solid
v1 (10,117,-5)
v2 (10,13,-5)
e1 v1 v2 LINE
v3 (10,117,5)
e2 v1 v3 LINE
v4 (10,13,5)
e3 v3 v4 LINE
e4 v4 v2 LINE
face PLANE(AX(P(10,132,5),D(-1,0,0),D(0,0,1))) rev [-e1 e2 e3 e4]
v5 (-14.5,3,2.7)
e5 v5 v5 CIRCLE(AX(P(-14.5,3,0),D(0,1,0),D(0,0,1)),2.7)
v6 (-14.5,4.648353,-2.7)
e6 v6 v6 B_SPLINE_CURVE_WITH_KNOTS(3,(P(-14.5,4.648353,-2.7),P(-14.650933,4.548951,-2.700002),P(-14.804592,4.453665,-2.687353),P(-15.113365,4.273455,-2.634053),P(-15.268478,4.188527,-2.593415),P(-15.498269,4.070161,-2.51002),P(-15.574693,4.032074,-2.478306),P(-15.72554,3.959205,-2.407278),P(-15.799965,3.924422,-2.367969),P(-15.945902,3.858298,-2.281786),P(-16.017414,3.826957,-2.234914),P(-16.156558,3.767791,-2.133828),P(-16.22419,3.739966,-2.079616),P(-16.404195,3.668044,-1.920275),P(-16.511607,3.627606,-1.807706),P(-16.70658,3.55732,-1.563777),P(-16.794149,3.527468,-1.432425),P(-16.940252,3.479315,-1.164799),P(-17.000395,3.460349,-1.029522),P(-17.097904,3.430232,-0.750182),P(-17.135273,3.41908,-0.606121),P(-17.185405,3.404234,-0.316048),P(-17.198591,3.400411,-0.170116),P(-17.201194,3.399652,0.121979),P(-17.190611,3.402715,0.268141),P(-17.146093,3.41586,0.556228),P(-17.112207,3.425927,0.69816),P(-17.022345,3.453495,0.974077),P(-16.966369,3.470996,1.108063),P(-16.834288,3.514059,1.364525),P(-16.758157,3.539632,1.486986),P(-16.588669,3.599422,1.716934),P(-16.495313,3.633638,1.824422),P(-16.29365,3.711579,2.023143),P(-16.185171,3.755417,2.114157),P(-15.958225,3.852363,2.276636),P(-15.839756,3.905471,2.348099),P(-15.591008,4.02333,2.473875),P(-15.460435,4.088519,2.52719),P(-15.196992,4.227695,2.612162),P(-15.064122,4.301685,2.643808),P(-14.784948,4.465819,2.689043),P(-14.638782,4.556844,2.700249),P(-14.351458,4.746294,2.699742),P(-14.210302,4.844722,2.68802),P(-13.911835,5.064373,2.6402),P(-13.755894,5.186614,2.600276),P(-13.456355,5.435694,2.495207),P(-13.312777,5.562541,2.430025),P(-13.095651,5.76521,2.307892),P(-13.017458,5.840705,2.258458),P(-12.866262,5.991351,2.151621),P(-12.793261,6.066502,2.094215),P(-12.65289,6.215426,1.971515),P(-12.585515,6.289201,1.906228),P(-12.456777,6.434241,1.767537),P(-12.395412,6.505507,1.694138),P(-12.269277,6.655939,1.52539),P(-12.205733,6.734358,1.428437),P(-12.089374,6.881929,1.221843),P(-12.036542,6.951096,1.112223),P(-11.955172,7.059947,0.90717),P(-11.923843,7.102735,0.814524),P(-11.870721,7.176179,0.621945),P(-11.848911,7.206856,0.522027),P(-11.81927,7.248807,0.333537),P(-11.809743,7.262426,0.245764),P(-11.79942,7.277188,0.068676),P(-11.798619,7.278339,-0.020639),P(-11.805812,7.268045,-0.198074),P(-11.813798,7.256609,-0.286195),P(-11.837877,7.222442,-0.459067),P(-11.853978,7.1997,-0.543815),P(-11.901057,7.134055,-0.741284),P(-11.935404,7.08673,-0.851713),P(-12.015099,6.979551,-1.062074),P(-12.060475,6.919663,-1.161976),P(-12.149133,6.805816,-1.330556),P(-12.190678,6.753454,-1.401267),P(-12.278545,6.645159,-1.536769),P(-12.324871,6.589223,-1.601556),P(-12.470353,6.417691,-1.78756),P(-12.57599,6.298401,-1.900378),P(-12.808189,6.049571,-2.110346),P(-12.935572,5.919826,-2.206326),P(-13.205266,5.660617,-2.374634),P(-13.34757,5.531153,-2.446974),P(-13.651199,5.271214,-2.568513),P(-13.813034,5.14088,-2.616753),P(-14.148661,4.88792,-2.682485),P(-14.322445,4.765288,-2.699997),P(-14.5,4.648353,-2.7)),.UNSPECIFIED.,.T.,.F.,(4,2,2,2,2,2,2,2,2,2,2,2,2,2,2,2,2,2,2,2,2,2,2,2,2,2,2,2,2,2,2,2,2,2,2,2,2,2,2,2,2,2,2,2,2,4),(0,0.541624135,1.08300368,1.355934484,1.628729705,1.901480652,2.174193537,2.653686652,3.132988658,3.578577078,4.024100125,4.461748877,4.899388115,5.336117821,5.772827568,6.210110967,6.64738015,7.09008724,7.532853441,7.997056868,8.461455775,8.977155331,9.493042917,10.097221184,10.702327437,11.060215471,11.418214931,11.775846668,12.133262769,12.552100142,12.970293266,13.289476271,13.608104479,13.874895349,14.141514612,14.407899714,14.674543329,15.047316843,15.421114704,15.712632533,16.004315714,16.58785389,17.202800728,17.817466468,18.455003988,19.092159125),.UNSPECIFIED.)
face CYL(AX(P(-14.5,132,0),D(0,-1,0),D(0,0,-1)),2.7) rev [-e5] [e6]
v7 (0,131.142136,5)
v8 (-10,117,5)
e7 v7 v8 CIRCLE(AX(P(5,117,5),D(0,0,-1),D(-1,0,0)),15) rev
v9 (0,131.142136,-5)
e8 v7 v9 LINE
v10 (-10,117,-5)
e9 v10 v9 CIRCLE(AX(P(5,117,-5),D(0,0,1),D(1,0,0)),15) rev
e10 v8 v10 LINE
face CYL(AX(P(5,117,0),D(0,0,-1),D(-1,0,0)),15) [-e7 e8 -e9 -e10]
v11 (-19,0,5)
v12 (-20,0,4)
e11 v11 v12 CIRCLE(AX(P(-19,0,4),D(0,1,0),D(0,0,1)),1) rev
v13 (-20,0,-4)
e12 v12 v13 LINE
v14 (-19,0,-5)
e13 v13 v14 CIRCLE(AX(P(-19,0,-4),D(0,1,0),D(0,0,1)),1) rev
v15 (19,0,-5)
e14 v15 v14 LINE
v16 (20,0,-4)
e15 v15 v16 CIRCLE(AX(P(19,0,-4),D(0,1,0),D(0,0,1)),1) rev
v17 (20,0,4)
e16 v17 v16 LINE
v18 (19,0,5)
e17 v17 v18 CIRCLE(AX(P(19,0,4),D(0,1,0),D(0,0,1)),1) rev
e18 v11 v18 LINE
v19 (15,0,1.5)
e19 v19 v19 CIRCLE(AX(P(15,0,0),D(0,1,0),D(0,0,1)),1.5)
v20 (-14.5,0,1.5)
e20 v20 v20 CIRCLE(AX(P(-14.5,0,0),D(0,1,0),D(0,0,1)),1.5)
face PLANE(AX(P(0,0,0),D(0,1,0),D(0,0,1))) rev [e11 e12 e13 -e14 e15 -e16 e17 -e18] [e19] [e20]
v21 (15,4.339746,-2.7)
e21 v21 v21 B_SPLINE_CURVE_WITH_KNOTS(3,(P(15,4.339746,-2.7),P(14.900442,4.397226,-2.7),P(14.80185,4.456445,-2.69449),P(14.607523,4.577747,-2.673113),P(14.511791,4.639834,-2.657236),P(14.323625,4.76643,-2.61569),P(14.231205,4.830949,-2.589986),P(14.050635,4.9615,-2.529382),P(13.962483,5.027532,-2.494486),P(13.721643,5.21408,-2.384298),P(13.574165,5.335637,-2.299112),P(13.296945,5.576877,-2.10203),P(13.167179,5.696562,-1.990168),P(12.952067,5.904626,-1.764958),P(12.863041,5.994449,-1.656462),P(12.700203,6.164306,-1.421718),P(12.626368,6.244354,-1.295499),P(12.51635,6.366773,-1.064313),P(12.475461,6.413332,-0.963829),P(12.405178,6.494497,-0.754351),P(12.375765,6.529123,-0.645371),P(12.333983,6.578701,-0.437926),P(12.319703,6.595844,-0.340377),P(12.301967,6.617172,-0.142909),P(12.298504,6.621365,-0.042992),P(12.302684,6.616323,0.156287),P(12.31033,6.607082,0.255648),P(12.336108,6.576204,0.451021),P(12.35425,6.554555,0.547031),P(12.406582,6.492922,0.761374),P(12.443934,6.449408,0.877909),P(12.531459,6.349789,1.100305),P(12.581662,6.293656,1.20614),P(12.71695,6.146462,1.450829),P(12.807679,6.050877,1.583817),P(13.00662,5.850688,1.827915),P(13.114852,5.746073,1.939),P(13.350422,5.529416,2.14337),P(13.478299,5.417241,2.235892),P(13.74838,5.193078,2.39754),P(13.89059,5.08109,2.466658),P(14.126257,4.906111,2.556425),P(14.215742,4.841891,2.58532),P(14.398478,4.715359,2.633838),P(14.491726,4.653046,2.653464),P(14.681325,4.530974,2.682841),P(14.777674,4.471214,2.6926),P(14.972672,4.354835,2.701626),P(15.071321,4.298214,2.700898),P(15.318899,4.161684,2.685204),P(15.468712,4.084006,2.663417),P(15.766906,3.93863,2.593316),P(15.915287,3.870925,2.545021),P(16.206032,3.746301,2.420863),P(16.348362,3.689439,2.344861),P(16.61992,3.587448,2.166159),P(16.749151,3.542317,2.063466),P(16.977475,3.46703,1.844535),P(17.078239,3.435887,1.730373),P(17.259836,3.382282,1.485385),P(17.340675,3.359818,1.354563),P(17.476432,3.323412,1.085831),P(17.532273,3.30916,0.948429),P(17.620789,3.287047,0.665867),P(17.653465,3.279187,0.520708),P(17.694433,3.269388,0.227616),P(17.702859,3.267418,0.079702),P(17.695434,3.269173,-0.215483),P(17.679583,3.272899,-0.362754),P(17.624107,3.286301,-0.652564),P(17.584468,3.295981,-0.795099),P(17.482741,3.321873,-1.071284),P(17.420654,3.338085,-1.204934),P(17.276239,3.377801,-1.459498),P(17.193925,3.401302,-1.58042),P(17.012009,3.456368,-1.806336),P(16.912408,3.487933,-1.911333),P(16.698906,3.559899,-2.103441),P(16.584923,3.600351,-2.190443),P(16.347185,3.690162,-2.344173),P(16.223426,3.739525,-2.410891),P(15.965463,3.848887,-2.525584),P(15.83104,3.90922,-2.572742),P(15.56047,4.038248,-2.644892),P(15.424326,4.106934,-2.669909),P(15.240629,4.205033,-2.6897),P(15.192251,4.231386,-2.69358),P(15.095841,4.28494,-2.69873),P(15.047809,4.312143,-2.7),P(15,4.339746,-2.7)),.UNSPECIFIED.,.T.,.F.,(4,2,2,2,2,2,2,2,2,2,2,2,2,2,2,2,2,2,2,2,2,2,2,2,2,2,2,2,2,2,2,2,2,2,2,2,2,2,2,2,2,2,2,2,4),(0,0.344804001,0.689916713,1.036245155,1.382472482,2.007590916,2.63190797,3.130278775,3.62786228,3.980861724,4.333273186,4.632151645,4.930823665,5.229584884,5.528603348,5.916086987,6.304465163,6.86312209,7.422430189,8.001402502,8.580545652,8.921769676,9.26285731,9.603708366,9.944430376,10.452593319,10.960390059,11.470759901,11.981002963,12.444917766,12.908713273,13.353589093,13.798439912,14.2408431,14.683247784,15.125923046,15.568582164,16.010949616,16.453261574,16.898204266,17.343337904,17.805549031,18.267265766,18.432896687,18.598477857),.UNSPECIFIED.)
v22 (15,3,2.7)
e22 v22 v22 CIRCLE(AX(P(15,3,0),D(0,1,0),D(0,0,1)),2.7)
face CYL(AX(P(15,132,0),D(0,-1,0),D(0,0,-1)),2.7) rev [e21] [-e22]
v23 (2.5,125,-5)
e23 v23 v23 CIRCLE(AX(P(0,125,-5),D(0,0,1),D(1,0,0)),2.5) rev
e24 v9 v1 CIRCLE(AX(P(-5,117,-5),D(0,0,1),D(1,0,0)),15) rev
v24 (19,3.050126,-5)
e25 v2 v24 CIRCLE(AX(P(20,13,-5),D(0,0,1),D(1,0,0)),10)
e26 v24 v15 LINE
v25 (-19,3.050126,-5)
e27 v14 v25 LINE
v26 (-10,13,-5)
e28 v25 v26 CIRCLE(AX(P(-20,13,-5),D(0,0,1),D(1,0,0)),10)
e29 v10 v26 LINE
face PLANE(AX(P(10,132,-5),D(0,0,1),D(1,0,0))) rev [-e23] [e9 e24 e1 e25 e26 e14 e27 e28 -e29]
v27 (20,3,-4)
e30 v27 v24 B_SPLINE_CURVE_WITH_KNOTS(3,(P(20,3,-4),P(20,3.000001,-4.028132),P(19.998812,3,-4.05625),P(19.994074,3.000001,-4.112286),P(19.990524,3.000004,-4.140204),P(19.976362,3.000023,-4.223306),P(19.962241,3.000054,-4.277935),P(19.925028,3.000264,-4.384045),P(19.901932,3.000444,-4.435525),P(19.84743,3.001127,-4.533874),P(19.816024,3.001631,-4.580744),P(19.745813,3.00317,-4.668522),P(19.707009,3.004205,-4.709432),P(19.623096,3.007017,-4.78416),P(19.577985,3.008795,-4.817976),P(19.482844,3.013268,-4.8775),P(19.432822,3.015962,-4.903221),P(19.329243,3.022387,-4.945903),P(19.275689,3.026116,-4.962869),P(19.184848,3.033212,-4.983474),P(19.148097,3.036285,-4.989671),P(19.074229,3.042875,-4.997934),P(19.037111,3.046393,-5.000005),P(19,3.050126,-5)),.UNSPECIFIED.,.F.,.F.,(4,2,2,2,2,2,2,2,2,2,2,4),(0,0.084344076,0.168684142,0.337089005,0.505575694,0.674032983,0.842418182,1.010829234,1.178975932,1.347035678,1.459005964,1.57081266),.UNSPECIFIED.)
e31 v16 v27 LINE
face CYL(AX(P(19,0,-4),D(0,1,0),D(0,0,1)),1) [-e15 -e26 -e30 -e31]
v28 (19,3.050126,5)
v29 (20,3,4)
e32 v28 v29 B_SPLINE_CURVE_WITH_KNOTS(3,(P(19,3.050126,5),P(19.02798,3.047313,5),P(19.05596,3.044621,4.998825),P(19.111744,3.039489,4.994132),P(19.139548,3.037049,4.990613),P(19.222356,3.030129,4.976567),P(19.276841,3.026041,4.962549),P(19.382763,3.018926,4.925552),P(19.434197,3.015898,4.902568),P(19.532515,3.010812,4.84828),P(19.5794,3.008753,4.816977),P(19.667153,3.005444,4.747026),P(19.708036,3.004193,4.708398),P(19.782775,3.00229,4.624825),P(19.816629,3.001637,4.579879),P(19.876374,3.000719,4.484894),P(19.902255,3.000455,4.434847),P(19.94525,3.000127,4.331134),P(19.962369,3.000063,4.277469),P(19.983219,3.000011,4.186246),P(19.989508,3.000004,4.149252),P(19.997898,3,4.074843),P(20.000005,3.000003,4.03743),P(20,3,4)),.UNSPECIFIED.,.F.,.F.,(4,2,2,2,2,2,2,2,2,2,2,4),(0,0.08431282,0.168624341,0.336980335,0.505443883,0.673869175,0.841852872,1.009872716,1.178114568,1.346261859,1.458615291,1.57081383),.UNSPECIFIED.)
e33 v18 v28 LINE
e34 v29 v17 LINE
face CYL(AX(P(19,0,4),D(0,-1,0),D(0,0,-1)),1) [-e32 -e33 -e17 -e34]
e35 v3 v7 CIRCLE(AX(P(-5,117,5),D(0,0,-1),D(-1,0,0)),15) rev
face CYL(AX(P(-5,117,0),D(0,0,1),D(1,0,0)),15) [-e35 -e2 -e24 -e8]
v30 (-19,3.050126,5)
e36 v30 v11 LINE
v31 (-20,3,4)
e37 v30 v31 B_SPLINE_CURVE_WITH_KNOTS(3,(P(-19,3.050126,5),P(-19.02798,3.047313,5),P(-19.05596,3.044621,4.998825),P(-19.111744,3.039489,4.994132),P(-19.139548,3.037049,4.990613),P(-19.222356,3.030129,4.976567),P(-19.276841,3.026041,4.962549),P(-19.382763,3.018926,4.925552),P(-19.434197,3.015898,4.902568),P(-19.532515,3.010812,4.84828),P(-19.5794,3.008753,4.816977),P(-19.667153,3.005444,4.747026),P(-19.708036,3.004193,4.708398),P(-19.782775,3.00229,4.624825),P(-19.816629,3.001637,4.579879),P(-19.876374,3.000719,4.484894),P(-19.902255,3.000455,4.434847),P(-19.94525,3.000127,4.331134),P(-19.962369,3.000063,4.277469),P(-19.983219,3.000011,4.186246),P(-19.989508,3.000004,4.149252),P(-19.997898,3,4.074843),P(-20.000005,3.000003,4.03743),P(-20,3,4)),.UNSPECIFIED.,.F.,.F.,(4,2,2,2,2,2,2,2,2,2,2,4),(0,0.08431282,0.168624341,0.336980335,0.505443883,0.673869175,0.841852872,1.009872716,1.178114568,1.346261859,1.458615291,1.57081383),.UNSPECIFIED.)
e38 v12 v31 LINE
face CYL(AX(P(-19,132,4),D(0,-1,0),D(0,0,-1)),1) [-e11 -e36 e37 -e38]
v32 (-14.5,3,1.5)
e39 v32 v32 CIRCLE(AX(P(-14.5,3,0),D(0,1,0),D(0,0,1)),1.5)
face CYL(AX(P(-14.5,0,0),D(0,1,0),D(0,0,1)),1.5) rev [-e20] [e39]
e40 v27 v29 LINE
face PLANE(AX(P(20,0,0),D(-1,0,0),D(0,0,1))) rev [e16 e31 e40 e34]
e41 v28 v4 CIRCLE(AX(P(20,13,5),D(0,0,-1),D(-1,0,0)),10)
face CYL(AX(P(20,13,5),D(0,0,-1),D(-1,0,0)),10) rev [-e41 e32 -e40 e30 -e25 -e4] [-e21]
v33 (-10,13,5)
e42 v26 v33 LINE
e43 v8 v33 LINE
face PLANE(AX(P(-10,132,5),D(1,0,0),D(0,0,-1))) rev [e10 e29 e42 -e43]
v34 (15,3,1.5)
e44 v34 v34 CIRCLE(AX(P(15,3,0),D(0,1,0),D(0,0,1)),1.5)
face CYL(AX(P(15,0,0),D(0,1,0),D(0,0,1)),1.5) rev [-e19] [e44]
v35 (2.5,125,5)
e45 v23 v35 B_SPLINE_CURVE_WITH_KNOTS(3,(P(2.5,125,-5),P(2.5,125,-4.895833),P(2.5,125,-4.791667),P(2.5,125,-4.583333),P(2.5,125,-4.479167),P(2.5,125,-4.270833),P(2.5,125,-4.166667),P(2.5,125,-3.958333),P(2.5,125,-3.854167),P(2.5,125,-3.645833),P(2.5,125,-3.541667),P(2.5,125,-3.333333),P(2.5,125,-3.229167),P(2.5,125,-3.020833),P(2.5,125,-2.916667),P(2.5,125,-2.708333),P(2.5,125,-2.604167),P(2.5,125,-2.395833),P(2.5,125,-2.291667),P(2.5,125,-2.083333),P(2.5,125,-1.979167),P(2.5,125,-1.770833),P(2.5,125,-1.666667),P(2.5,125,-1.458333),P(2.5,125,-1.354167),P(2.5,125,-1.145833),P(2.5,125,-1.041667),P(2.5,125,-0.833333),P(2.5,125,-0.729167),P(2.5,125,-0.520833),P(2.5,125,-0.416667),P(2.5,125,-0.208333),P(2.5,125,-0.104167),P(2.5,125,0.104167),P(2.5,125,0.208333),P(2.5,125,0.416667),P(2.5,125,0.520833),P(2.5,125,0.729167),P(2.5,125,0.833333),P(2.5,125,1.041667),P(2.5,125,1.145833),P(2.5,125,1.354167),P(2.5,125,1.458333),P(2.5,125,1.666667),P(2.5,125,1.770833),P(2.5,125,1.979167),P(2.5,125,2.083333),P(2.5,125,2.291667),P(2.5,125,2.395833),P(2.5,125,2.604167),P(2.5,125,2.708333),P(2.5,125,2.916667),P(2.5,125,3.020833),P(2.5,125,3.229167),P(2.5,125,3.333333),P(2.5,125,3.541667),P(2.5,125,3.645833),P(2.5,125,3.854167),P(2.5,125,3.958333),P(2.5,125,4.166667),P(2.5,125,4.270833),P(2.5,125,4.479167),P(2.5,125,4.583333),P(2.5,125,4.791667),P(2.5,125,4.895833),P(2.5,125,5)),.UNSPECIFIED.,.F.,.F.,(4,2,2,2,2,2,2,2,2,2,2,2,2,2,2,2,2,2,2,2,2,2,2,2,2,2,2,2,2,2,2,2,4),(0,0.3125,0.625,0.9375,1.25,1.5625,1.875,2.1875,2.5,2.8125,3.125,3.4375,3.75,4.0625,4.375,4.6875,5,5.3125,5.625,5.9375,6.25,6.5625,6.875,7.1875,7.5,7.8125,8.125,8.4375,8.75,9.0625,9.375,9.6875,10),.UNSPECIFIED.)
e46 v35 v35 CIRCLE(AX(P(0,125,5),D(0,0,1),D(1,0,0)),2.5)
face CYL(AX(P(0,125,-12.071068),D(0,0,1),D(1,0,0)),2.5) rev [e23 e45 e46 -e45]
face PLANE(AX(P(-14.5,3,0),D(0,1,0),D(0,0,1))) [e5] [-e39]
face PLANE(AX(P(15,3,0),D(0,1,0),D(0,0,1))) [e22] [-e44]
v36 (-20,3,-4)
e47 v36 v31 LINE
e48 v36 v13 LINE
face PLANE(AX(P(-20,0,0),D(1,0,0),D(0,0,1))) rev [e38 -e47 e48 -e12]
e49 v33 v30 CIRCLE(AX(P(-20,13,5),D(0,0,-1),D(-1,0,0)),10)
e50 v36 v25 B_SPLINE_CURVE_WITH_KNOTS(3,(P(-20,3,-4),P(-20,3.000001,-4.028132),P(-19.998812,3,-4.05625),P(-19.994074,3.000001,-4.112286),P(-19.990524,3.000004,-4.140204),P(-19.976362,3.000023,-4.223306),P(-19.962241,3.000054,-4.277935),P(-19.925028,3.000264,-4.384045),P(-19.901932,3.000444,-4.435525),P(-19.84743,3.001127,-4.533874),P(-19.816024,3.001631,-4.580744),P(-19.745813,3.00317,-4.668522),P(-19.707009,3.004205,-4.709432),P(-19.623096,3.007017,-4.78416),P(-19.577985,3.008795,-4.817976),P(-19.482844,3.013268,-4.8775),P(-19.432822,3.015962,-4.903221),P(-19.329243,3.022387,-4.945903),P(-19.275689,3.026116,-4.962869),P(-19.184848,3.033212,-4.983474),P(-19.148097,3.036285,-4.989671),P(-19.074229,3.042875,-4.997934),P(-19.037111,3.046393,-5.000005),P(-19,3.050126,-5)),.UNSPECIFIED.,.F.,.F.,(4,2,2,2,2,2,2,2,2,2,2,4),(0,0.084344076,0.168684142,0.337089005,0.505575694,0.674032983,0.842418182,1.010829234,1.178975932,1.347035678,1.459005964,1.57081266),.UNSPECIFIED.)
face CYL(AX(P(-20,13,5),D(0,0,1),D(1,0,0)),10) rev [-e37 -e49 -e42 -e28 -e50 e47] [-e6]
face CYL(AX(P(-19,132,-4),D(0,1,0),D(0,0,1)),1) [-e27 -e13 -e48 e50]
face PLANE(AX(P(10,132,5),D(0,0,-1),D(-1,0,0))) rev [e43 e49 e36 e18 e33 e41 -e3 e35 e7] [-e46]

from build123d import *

# Parameters (mm, degrees)
SKETCH2_W               = 20
SKETCH2_H               = 10
BOSS_EXTRUDE1_DEPTH     = 132
SKETCH6_W               = 10
SKETCH6_H               = 3
BOSS_EXTRUDE2_DEPTH     = 10
FILLET2_R               = 10
CUT_EXTRUDE5_DEPTH      = 131.636901372
CUT_EXTRUDE5_DEPTH_BACK = 131.636901372
SKETCH19_R              = 1.5
SKETCH19_5_R            = 2.7
SKETCH19_5_R_2          = 1.5
CUT_EXTRUDE7_DEPTH      = 131.636901376
FILLET1_R               = 1
FILLET3_R               = 10
CUT_EXTRUDE8_DEPTH      = 131.636901391
CUT_EXTRUDE8_DEPTH_BACK = 131.636901391
SKETCH20_R              = 1.5
SKETCH20_3_R            = 2.7
SKETCH20_3_R_2          = 1.5
CUT_EXTRUDE9_DEPTH      = 131.636901391
SKETCH21_R              = 2.5
CUT_EXTRUDE10_DEPTH     = 10
FILLET4_R               = 15


# Some blends are built 0.0001 mm under size
with BuildPart() as part:
    # Sketch2 → Boss-Extrude1 (new body)
    with BuildSketch(Plane(origin=(0, 0, 0), x_dir=(1, 0, 0), z_dir=(0, 1, 0))):
        Rectangle(SKETCH2_W, SKETCH2_H)
    extrude(amount=BOSS_EXTRUDE1_DEPTH)

    # Sketch6 → Boss-Extrude2 (add)
    with BuildSketch(Plane(origin=(10, 0, 0), x_dir=(0, 0, -1), z_dir=(1, 0, 0))):
        with Locations((0, 1.5)):
            Rectangle(SKETCH6_W, SKETCH6_H)
    boss_extrude2 = extrude(amount=BOSS_EXTRUDE2_DEPTH)

    # Fillet2
    fillet2_edges = [part.edges().sort_by_distance(p)[0] for p in [
        (10, 3, 0),
    ]]
    fillet(fillet2_edges, radius=FILLET2_R - 0.0001)  # a hair under: the kernel refuses the full size

    # Sketch19 → Cut-Extrude5 (cut, two sides: drawn at the far end of the back side and taken through both)
    with BuildSketch(Plane(origin=(0, 3, 0), x_dir=(1, 0, 0), z_dir=(0, 1, 0)).offset(-CUT_EXTRUDE5_DEPTH_BACK)):
        with Locations(Location((15, 0, 0), (0, 0, 270))):
            Circle(SKETCH19_R)
    extrude(amount=CUT_EXTRUDE5_DEPTH + CUT_EXTRUDE5_DEPTH_BACK, mode=Mode.SUBTRACT)

    # Sketch19<5> → Cut-Extrude7 (cut, through all)
    with BuildSketch(Plane(origin=(0, 3, 0), x_dir=(1, 0, 0), z_dir=(0, 1, 0))):
        with Locations(Location((15, 0, 0), (0, 0, 90))):
            Circle(SKETCH19_5_R)
        with Locations(Location((15, 0, 0), (0, 0, 270))):
            Circle(SKETCH19_5_R_2, mode=Mode.SUBTRACT)
    extrude(amount=CUT_EXTRUDE7_DEPTH, mode=Mode.SUBTRACT)

    # Mirror16: Boss-Extrude2 across plane
    add(boss_extrude2.mirror(Plane(origin=(0, 0, 0), x_dir=(0, 0, 1), z_dir=(1, 0, 0))))

    # Fillet1
    fillet1_edges = [part.edges().sort_by_distance(p)[0] for p in [
        (20, 1.5, 5),
        (20, 1.5, -5),
        (-20, 1.5, 5),
        (-20, 1.5, -5),
    ]]
    fillet(fillet1_edges, radius=FILLET1_R)

    # Fillet3
    fillet3_edges = [part.edges().sort_by_distance(p)[0] for p in [
        (-10, 3, 0),
    ]]
    fillet(fillet3_edges, radius=FILLET3_R - 0.0001)  # a hair under: the kernel refuses the full size

    # Sketch20 → Cut-Extrude8 (cut, two sides: drawn at the far end of the back side and taken through both)
    with BuildSketch(Plane(origin=(0, 3, 0), x_dir=(1, 0, 0), z_dir=(0, 1, 0)).offset(-CUT_EXTRUDE8_DEPTH_BACK)):
        with Locations(Location((-14.5, 0, 0), (0, 0, 270))):
            Circle(SKETCH20_R)
    extrude(amount=CUT_EXTRUDE8_DEPTH + CUT_EXTRUDE8_DEPTH_BACK, mode=Mode.SUBTRACT)

    # Sketch20<3> → Cut-Extrude9 (cut, through all)
    with BuildSketch(Plane(origin=(0, 3, 0), x_dir=(1, 0, 0), z_dir=(0, 1, 0))):
        with Locations(Location((-14.5, 0, 0), (0, 0, 90))):
            Circle(SKETCH20_3_R)
        with Locations(Location((-14.5, 0, 0), (0, 0, 270))):
            Circle(SKETCH20_3_R_2, mode=Mode.SUBTRACT)
    extrude(amount=CUT_EXTRUDE9_DEPTH, mode=Mode.SUBTRACT)

    # Sketch21 → Cut-Extrude10 (cut)
    with BuildSketch(Plane.XY.offset(5)):
        with Locations((0, 125)):
            Circle(SKETCH21_R)
    extrude(amount=-CUT_EXTRUDE10_DEPTH, mode=Mode.SUBTRACT)

    # Fillet4
    # the kernel refuses this fillet: 15 mm, written as the material it takes off along each edge
    with BuildSketch(Plane(origin=(-10, 132, 42.5), x_dir=(0, -1, 0), z_dir=(0, 0, -1))) as fillet4_piece_1:
        with BuildLine():
            CenterArc((FILLET4_R, -FILLET4_R), FILLET4_R, 90, 90)
            Line((0, -FILLET4_R), (0, 0))
            Line((0, 0), (FILLET4_R, 0))
        make_face()
    extrude(amount=85, mode=Mode.SUBTRACT)
    with BuildSketch(Plane(origin=(10, 132, -42.5), x_dir=(-1, 0, 0), z_dir=(0, 0, 1))) as fillet4_piece_2:
        with BuildLine():
            CenterArc((FILLET4_R, FILLET4_R), FILLET4_R, 180, 90)
            Line((0, FILLET4_R), (0, 0))
            Line((0, 0), (FILLET4_R, 0))
        make_face()
    extrude(amount=85, mode=Mode.SUBTRACT)


solid = part.part
